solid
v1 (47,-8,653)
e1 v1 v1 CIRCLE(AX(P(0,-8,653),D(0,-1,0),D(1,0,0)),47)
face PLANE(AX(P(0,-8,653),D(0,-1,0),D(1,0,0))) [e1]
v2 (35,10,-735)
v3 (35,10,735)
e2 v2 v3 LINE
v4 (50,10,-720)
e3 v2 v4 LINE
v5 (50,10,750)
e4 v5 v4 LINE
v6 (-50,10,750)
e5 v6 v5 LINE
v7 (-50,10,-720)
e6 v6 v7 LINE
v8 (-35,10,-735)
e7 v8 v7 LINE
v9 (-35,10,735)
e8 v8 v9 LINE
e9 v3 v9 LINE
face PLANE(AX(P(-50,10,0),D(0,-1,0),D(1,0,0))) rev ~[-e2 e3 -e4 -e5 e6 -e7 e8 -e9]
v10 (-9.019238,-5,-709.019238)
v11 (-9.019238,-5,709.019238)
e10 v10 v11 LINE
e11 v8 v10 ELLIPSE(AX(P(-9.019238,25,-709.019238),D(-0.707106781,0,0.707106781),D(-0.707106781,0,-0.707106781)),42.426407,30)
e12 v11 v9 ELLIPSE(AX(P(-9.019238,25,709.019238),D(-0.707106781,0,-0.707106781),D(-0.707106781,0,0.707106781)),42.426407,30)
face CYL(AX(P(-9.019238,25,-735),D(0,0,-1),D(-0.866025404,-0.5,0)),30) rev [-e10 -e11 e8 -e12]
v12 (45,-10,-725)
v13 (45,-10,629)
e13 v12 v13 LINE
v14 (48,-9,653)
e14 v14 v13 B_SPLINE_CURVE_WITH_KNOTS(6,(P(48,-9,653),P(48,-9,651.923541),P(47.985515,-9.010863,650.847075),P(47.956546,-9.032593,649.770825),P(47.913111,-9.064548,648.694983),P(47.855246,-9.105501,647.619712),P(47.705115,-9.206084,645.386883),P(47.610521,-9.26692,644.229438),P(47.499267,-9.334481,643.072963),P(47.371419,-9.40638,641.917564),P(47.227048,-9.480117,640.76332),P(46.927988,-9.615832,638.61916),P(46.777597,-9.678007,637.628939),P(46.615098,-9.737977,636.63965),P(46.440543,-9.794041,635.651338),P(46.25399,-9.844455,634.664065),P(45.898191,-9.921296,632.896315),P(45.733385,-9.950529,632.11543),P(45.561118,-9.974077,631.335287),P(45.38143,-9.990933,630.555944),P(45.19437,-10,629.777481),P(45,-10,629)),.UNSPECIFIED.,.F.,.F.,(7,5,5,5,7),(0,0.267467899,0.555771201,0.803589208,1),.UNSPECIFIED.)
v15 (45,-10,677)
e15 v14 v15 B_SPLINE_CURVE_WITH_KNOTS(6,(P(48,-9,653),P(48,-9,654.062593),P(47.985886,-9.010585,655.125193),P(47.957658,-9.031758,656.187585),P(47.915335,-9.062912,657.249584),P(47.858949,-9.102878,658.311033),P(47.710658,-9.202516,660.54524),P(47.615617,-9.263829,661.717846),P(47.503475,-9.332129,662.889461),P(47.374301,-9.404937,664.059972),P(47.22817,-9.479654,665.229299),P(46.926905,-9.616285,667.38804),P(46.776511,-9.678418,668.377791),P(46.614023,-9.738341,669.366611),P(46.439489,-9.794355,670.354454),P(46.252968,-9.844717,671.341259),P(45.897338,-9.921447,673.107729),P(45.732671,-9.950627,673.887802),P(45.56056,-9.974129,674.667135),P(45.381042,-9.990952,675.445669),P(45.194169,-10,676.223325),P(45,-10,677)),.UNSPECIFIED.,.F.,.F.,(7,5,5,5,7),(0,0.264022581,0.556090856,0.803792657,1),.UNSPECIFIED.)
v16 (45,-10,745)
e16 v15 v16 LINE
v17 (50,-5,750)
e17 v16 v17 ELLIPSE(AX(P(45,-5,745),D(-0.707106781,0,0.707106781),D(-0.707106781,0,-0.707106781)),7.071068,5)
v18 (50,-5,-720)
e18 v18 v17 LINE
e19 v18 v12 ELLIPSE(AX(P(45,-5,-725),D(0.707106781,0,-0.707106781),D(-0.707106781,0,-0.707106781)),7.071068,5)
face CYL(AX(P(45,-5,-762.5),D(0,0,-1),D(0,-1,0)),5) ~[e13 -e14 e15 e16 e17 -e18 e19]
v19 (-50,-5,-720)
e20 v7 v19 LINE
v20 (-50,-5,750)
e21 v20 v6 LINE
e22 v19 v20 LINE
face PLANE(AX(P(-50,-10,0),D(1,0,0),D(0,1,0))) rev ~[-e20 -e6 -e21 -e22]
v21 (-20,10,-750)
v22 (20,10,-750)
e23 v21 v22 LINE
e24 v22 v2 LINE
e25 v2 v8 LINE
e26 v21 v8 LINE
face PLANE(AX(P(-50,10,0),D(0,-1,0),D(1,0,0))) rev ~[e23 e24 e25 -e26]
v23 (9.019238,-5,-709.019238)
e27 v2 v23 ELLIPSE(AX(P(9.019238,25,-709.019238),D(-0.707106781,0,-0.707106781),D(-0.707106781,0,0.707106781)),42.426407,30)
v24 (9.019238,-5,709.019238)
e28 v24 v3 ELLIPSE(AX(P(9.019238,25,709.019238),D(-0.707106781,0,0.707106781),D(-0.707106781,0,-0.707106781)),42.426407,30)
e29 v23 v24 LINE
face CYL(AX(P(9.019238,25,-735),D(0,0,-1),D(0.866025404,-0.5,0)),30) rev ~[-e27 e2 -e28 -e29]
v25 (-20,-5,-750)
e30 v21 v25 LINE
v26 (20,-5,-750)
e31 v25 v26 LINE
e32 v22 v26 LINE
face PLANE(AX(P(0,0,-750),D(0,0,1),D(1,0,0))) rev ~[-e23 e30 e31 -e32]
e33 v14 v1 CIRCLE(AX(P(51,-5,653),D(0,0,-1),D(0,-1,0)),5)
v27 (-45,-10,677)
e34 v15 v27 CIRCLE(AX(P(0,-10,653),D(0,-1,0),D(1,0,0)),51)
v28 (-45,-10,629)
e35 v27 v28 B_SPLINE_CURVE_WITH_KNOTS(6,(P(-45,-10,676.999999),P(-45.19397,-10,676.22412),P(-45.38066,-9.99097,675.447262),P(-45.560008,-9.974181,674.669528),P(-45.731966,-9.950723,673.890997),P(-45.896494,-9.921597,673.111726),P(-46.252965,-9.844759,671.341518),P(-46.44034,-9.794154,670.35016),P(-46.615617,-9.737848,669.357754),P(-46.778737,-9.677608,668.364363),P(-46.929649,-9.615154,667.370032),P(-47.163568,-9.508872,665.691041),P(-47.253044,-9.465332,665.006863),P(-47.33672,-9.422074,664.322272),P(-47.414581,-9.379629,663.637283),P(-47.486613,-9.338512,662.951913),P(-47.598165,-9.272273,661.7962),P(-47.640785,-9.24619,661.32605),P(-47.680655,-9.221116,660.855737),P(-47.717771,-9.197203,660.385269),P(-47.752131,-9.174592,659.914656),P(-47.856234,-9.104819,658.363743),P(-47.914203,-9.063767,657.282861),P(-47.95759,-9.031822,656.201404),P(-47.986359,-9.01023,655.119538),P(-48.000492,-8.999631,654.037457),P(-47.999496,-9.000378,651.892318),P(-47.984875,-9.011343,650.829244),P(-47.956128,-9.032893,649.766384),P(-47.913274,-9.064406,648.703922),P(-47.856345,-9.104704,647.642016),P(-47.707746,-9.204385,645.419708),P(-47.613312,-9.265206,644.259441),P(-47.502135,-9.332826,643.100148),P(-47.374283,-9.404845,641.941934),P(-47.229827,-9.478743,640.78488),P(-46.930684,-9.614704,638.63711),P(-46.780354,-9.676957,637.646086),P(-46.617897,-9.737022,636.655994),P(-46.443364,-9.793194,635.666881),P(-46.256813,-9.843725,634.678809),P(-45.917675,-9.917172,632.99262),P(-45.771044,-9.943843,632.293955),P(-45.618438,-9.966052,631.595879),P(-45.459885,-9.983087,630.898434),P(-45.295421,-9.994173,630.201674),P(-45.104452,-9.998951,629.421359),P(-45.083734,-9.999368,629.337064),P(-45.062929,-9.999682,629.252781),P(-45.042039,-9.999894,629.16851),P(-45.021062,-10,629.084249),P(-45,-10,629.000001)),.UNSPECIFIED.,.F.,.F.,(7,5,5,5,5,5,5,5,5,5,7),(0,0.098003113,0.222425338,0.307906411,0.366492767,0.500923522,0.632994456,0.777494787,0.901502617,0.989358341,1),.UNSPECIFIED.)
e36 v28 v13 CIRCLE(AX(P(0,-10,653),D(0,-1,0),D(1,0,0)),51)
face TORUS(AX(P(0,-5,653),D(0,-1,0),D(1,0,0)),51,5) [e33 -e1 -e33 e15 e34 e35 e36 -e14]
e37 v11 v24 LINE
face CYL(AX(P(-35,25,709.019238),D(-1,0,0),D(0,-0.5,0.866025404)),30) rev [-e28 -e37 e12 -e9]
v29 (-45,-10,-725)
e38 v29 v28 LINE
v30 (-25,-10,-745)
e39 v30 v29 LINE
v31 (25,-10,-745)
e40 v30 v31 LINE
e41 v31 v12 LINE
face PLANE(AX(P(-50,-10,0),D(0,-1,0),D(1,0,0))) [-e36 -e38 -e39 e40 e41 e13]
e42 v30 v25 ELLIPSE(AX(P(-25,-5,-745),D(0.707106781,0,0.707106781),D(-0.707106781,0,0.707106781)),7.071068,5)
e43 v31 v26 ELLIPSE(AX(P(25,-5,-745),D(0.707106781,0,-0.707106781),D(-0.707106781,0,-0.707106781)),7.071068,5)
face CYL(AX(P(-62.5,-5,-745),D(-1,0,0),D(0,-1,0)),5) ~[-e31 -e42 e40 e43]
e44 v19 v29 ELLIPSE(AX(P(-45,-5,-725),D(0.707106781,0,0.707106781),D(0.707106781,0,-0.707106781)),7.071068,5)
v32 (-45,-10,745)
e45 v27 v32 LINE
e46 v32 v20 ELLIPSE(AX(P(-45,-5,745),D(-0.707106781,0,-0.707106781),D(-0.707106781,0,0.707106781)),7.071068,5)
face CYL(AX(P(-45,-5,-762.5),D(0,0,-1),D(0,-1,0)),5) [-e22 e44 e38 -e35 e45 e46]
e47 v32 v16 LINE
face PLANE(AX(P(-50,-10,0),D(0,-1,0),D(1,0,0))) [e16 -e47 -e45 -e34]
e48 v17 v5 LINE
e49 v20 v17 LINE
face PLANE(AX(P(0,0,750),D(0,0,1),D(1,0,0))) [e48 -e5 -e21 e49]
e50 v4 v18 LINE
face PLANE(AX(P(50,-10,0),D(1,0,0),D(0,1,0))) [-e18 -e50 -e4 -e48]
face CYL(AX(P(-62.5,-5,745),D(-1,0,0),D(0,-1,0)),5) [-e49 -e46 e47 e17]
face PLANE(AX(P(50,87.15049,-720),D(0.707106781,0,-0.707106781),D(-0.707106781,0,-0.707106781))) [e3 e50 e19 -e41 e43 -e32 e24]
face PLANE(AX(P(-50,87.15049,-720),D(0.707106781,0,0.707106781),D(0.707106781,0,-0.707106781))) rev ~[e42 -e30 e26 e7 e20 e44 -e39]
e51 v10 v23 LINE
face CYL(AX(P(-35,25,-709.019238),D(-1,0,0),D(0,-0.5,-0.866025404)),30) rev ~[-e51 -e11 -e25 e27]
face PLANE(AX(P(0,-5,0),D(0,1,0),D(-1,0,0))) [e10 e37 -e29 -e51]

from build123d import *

# Parameters (mm, degrees)
F0_W        = 100
F0_H        = 20
F1_DEPTH    = 750
F2_R        = 47
F3_DEPTH    = 2
F4_W        = 70
F4_H        = 1470
F5_DEPTH    = 15
F6_T1_DEPTH = 70
F6_T3_DEPTH = 1470
F7_T1_DEPTH = 125
F7_T3_DEPTH = 1525
F8_T1_DEPTH = 169.300979278


# Not quite as in the source:
# - a fillet or chamfer that OpenCascade refuses, or shapes differently, is made with other operations: its cross-section is extruded or revolved along the edge and cut away or added


with BuildPart() as f1:
    # F0 (on Top) → F1 (new body, symmetric)
    with BuildSketch(Plane.XY):
        Rectangle(F0_W, F0_H)
    extrude(amount=F1_DEPTH, both=True)

    # F2 (on face) → F3 (cut)
    with BuildSketch(Plane.XZ.offset(10)):
        with Locations((0, 653)):
            Circle(F2_R)
    extrude(amount=-F3_DEPTH, mode=Mode.SUBTRACT)

    # F4 (on face) → F5 (cut)
    with BuildSketch(Plane(origin=(0, 10, 0), x_dir=(-1, 0, 0), z_dir=(0, 1, 0))):
        Rectangle(F4_W, F4_H)
    extrude(amount=-F5_DEPTH, mode=Mode.SUBTRACT)

    # F6: fillet of radius 30 on 4 edges, made by hand

    # F6_s2 → F6_t1 (join)
    with BuildSketch(Plane.YZ.offset(-35)):
        with BuildLine():
            ThreePointArc((10, 735), (-0.9807621135, 724.0192378865), (-5, 709.0192378865))
            Line((-5, 709.0192378865), (-5, 735))
            Line((-5, 735), (10, 735))
        make_face()
        with BuildLine():
            ThreePointArc((10, -735), (-0.9807621135, -724.0192378865), (-5, -709.0192378865))
            Line((-5, -709.0192378865), (-5, -735))
            Line((-5, -735), (10, -735))
        make_face()
    extrude(amount=F6_T1_DEPTH)

    # F6_s4 → F6_t3 (join)
    with BuildSketch(Plane.XY.offset(-735)):
        with BuildLine():
            ThreePointArc((35, 10), (24.0192378865, -0.9807621135), (9.0192378865, -5))
            Line((9.0192378865, -5), (35, -5))
            Line((35, -5), (35, 10))
        make_face()
        with BuildLine():
            ThreePointArc((-35, 10), (-24.0192378865, -0.9807621135), (-9.0192378865, -5))
            Line((-9.0192378865, -5), (-35, -5))
            Line((-35, -5), (-35, 10))
        make_face()
    extrude(amount=F6_T3_DEPTH)

    # F7: fillet of radius 5 on 5 edges, made by hand

    # F7_s2 → F7_t1 (cut)
    with BuildSketch(Plane.YZ.offset(-62.5)):
        with BuildLine():
            ThreePointArc((-10, -745), (-8.5355339059, -748.5355339059), (-5, -750))
            Line((-5, -750), (-10, -750))
            Line((-10, -750), (-10, -745))
        make_face()
        with BuildLine():
            ThreePointArc((-10, 745), (-8.5355339059, 748.5355339059), (-5, 750))
            Line((-5, 750), (-10, 750))
            Line((-10, 750), (-10, 745))
        make_face()
    extrude(amount=F7_T1_DEPTH, mode=Mode.SUBTRACT)

    # F7_s4 → F7_t3 (cut)
    with BuildSketch(Plane.XY.offset(-762.5)):
        with BuildLine():
            ThreePointArc((-45, -10), (-48.5355339059, -8.5355339059), (-50, -5))
            Line((-50, -5), (-50, -10))
            Line((-50, -10), (-45, -10))
        make_face()
        with BuildLine():
            ThreePointArc((45, -10), (48.5355339059, -8.5355339059), (50, -5))
            Line((50, -5), (50, -10))
            Line((50, -10), (45, -10))
        make_face()
    extrude(amount=F7_T3_DEPTH, mode=Mode.SUBTRACT)

    # F7_s5 → F7_t6 (revolve, cut)
    with BuildSketch(Plane.XY.offset(653)):
        with BuildLine():
            ThreePointArc((51, -10), (48.7639320225, -9.472135955), (47, -8))
            Line((47, -8), (47, -10))
            Line((47, -10), (51, -10))
        make_face()
    revolve(axis=Axis((0, -10, 653), (0, -1, 0)), mode=Mode.SUBTRACT)

    # F8: chamfer of 30 on 2 edges, made by hand

    # F8_s2 → F8_t1 (cut)
    with BuildSketch(Plane.XZ.offset(-87.150489639)):
        Polygon((50, -720), (20, -750), (50, -750), align=None)
        Polygon((-50, -720), (-20, -750), (-50, -750), align=None)
    extrude(amount=F8_T1_DEPTH, mode=Mode.SUBTRACT)


solid = f1.part
